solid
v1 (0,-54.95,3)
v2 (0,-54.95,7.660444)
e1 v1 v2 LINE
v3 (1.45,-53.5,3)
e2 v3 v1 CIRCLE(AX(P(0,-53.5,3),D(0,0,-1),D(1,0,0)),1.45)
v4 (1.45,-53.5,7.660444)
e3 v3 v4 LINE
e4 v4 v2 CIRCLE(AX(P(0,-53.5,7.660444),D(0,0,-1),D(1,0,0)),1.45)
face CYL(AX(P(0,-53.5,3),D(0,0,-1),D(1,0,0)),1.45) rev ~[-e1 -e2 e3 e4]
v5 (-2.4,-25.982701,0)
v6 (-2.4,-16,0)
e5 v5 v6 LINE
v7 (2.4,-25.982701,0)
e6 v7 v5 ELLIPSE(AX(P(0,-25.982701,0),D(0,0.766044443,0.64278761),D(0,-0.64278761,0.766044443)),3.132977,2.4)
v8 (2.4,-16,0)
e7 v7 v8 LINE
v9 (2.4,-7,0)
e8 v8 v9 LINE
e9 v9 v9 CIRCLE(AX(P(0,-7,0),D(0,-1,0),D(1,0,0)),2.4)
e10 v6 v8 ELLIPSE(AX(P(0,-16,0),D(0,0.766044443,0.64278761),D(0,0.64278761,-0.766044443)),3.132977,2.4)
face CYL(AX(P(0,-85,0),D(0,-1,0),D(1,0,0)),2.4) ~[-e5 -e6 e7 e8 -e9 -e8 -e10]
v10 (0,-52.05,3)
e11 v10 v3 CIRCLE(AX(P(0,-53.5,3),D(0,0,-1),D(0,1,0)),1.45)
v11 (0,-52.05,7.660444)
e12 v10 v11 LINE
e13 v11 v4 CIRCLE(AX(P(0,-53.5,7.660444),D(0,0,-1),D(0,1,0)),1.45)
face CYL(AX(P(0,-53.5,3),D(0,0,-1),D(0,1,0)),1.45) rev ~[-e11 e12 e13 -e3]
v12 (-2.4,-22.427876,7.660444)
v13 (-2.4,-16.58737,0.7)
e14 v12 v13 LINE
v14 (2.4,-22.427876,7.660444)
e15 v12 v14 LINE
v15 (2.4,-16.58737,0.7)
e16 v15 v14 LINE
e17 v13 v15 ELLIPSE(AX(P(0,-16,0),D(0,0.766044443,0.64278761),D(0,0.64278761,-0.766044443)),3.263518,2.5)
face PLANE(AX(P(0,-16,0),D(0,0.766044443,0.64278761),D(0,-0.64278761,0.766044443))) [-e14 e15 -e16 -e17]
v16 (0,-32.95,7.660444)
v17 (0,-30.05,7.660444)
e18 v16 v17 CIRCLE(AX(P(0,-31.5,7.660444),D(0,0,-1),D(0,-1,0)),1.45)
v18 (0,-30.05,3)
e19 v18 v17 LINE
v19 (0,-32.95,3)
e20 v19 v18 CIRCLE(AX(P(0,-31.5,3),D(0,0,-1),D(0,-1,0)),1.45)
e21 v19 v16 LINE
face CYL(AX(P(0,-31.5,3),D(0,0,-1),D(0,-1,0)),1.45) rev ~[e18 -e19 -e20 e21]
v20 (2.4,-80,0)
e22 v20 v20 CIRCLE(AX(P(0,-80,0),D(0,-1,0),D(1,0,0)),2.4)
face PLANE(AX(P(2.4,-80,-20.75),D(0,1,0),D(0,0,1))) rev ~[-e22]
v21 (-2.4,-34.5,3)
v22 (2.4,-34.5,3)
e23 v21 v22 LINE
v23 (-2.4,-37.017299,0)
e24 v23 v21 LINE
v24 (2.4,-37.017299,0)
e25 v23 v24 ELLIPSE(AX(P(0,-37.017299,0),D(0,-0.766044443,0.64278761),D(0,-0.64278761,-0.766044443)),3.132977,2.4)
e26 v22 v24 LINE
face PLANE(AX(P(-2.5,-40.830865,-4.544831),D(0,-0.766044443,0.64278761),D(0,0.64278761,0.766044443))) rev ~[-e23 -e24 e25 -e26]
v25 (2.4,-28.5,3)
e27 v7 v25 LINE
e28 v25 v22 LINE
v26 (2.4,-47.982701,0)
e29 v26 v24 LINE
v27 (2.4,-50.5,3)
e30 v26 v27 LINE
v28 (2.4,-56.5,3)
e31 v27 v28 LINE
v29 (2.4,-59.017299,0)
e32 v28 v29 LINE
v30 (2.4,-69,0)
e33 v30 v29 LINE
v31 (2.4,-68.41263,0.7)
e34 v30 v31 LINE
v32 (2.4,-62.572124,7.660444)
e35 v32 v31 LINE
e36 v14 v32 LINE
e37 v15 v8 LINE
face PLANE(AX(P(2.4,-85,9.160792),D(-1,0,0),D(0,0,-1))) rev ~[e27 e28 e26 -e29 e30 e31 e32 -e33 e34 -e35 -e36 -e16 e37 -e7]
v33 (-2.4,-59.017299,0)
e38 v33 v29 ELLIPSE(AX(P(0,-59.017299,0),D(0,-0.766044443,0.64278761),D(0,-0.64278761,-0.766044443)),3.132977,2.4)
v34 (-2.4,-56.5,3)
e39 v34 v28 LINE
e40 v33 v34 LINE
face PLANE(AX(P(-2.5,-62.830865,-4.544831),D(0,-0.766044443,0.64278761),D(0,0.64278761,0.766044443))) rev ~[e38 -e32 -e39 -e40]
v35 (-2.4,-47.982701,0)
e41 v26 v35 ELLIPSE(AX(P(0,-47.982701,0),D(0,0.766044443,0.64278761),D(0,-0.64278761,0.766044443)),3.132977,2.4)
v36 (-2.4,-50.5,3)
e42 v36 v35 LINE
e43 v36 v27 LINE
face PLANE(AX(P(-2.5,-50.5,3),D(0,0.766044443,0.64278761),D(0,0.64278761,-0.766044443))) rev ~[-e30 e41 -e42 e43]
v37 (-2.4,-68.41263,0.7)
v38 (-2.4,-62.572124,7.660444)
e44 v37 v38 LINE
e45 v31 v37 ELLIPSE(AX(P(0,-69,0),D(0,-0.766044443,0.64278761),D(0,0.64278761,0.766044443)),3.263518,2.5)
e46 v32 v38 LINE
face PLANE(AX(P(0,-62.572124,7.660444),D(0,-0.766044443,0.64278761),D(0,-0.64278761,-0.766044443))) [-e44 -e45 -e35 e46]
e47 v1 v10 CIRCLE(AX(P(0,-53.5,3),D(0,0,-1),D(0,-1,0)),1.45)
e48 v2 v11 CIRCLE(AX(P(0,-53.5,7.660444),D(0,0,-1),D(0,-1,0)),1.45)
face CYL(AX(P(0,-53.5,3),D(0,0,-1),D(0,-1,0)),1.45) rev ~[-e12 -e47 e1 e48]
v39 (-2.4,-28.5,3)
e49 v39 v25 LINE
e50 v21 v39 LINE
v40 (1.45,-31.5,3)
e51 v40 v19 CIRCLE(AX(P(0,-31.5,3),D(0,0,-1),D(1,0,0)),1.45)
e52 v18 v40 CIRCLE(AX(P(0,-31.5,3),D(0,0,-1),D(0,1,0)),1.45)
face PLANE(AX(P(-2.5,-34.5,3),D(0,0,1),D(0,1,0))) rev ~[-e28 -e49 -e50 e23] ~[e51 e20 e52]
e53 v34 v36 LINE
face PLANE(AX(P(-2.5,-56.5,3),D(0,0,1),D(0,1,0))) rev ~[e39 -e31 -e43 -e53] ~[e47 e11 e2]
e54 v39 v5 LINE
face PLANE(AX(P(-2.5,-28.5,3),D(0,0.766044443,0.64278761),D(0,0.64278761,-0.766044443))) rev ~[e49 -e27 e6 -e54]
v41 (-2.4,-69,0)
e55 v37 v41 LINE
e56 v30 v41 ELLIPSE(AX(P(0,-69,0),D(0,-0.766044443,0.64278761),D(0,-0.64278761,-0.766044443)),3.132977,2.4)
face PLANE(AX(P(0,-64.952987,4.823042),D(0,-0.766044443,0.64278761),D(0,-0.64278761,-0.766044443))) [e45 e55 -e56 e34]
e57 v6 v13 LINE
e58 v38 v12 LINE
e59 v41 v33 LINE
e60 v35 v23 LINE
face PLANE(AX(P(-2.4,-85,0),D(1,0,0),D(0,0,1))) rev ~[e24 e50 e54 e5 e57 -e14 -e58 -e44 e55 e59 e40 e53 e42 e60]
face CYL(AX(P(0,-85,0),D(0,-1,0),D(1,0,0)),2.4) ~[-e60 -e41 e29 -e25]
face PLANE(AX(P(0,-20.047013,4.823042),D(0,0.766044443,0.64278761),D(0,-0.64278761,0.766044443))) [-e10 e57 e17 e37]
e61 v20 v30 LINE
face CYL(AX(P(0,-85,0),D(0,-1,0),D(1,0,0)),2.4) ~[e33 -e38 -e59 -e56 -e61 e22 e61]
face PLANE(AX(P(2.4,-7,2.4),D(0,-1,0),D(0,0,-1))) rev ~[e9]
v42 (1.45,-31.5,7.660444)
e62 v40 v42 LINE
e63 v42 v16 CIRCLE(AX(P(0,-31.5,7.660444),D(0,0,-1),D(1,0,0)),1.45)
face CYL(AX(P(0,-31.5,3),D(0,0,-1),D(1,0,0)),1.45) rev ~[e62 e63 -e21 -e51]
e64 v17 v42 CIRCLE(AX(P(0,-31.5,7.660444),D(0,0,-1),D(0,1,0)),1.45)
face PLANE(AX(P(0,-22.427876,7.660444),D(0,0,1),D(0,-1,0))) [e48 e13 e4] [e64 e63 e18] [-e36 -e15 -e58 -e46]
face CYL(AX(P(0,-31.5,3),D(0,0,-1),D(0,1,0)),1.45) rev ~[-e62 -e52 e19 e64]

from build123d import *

# Parameters (mm, degrees)
F0_R      = 2.5
F1_DEPTH  = 85
F3_DEPTH  = 2.5
F5_DEPTH  = 25
F8_DEPTH  = 25
F9_DEPTH  = 25
F11_DEPTH = 25
F14_DEPTH = 102
F16_REACH = 96.5783545855
F18_REACH = 97.7333268634
F19_W     = 5
F19_H     = 41.5
F20_DEPTH = 25


with BuildPart() as f1:
    # F0 (on Front) → F1 (new body)
    with BuildSketch(Plane.XZ):
        Circle(F0_R)
    extrude(amount=F1_DEPTH)

    # F2 (on Right) → F3 (join, symmetric)
    with BuildSketch(Plane.YZ):
        Polygon((-69, 0), (-16, 0), (-22.4278760969, 7.6604444312), (-62.5721239031, 7.6604444312), align=None)
    extrude(amount=F3_DEPTH, both=True)

    # F4 (on face) → F5 (cut)
    with BuildSketch(Plane(origin=(-2.5, 0, 0), x_dir=(0, -1, 0), z_dir=(-1, 0, 0))):
        Polygon((56.5, 3), (53.5, 3), (50.5, 3), (44.1691353238, -4.5448307221), (62.8308646762, -4.5448307221), align=None)
        Polygon((40.8308646762, -4.5448307221), (34.5, 3), (31.5, 3), (28.5, 3), (22.1691353238, -4.5448307221), align=None)
    extrude(amount=-F5_DEPTH, mode=Mode.SUBTRACT)

    # F7 (on face) → F8 (cut)
    with BuildSketch(Plane(origin=(-2.5, 0, 0), x_dir=(0, -1, 0), z_dir=(-1, 0, 0))):
        Polygon((19.9172031134, 7.5), (22.2932472338, 7.5), (22.4278760969, 7.6604444312), (62.5721239031, 7.6604444312), (62.7067527662, 7.5), (66.5233954787, 7.5), (66.5233954787, 10.3880958632), (19.9172031134, 10.3880958632), align=None)
    extrude(amount=-F8_DEPTH, mode=Mode.SUBTRACT)

    # F6 (on face) → F9 (cut)
    with BuildSketch(Plane(origin=(0, 0, 3), x_dir=(1, 0, 0), z_dir=(0, 0, -1))):
        with BuildLine():
            ThreePointArc((1.45, 53.5), (1.0253048327, 54.5253048327), (0, 54.95))
            Line((0, 54.95), (0, 52.05))
            ThreePointArc((0, 52.05), (1.0253048327, 52.4746951673), (1.45, 53.5))
        make_face()
        with BuildLine():
            Line((0, 52.05), (0, 54.95))
            ThreePointArc((0, 54.95), (-1.45, 53.5), (0, 52.05))
        make_face()
    extrude(amount=-F9_DEPTH, mode=Mode.SUBTRACT)

    # F10 (on face) → F11 (cut)
    with BuildSketch(Plane(origin=(0, 0, 3), x_dir=(1, 0, 0), z_dir=(0, 0, -1))):
        with BuildLine():
            ThreePointArc((1.45, 31.5), (1.0253048327, 32.5253048327), (0, 32.95))
            Line((0, 32.95), (0, 30.05))
            ThreePointArc((0, 30.05), (1.0253048327, 30.4746951673), (1.45, 31.5))
        make_face()
        with BuildLine():
            Line((0, 30.05), (0, 32.95))
            ThreePointArc((0, 32.95), (-1.45, 31.5), (0, 30.05))
        make_face()
    extrude(amount=-F11_DEPTH, mode=Mode.SUBTRACT)

    # F13 (on face) → F14 (cut)
    with BuildSketch(Plane.XZ.offset(85)):
        with BuildLine():
            ThreePointArc((2.4, 0), (0, -2.4), (-2.4, 0))
            Line((-2.4, 0), (-2.4, 9.7710704431))
            Line((-2.4, 9.7710704431), (-6.1972029507, 9.7710704431))
            Line((-6.1972029507, 9.7710704431), (-6.1972029507, -5.7614380494))
            Line((-6.1972029507, -5.7614380494), (5.5722752586, -5.7614380494))
            Line((5.5722752586, -5.7614380494), (5.5722752586, 8.8547384366))
            Line((5.5722752586, 8.8547384366), (2.4, 9.1607915238))
            Line((2.4, 9.1607915238), (2.4, 0))
        make_face()
    extrude(amount=-F14_DEPTH, mode=Mode.SUBTRACT)

    f16_end = Plane(origin=(0, -64.9529870595, 4.8230422111), x_dir=(0, -0.6427876097, -0.7660444431), z_dir=(0, -0.7660444431, 0.6427876097))
    # F15 (on face) → F16 (cut, up to a plane its end follows)
    with BuildSketch(Plane.XZ.offset(85)):
        with BuildLine():
            ThreePointArc((-2.4, 0), (0, 2.4), (2.4, 0))
            Line((2.4, 0), (4.8319334164, 0))
            Line((4.8319334164, 0), (4.1808704846, 8.0774491653))
            Line((4.1808704846, 8.0774491653), (-2.9383567162, 8.0774491653))
            Line((-2.9383567162, 8.0774491653), (-3.4620375372, 0))
            Line((-3.4620375372, 0), (-2.4, 0))
        make_face()
    f16_long = extrude(amount=-F16_REACH, mode=Mode.PRIVATE)
    add(split(f16_long, bisect_by=f16_end, keep=Keep.TOP, mode=Mode.PRIVATE), mode=Mode.SUBTRACT)

    f18_end = Plane(origin=(0, -20.0470129405, 4.8230422111), x_dir=(0, -0.6427876097, 0.7660444431), z_dir=(0, 0.7660444431, 0.6427876097))
    # F17 (on face) → F18 (cut, up to a plane its end follows)
    with BuildSketch(Plane(origin=(0, 0, 0), x_dir=(-1, 0, 0), z_dir=(0, 1, 0))):
        with BuildLine():
            ThreePointArc((-2.4, 0), (0, 2.4), (2.4, 0))
            Line((2.4, 0), (3.9089121856, 0))
            Line((3.9089121856, 0), (4.3247276917, 8.6870230734))
            Line((4.3247276917, 8.6870230734), (-4.9837511033, 8.3660408854))
            Line((-4.9837511033, 8.3660408854), (-3.4170385916, 0))
            Line((-3.4170385916, 0), (-2.4, 0))
        make_face()
    f18_long = extrude(amount=-F18_REACH, mode=Mode.PRIVATE)
    add(split(f18_long, bisect_by=f18_end, keep=Keep.TOP, mode=Mode.PRIVATE), mode=Mode.SUBTRACT)

    # F19 (on face) → F20 (cut)
    with BuildSketch(Plane.YZ.offset(2.4)):
        Polygon((0, -4.5159468427), (0, -2.4), (0, 2.4), (-7, 2.4), (-7, -4.5159468427), align=None)
        with Locations((-82.5, 0)):
            Rectangle(F19_W, F19_H)
    extrude(amount=-F20_DEPTH, mode=Mode.SUBTRACT)


solid = f1.part
